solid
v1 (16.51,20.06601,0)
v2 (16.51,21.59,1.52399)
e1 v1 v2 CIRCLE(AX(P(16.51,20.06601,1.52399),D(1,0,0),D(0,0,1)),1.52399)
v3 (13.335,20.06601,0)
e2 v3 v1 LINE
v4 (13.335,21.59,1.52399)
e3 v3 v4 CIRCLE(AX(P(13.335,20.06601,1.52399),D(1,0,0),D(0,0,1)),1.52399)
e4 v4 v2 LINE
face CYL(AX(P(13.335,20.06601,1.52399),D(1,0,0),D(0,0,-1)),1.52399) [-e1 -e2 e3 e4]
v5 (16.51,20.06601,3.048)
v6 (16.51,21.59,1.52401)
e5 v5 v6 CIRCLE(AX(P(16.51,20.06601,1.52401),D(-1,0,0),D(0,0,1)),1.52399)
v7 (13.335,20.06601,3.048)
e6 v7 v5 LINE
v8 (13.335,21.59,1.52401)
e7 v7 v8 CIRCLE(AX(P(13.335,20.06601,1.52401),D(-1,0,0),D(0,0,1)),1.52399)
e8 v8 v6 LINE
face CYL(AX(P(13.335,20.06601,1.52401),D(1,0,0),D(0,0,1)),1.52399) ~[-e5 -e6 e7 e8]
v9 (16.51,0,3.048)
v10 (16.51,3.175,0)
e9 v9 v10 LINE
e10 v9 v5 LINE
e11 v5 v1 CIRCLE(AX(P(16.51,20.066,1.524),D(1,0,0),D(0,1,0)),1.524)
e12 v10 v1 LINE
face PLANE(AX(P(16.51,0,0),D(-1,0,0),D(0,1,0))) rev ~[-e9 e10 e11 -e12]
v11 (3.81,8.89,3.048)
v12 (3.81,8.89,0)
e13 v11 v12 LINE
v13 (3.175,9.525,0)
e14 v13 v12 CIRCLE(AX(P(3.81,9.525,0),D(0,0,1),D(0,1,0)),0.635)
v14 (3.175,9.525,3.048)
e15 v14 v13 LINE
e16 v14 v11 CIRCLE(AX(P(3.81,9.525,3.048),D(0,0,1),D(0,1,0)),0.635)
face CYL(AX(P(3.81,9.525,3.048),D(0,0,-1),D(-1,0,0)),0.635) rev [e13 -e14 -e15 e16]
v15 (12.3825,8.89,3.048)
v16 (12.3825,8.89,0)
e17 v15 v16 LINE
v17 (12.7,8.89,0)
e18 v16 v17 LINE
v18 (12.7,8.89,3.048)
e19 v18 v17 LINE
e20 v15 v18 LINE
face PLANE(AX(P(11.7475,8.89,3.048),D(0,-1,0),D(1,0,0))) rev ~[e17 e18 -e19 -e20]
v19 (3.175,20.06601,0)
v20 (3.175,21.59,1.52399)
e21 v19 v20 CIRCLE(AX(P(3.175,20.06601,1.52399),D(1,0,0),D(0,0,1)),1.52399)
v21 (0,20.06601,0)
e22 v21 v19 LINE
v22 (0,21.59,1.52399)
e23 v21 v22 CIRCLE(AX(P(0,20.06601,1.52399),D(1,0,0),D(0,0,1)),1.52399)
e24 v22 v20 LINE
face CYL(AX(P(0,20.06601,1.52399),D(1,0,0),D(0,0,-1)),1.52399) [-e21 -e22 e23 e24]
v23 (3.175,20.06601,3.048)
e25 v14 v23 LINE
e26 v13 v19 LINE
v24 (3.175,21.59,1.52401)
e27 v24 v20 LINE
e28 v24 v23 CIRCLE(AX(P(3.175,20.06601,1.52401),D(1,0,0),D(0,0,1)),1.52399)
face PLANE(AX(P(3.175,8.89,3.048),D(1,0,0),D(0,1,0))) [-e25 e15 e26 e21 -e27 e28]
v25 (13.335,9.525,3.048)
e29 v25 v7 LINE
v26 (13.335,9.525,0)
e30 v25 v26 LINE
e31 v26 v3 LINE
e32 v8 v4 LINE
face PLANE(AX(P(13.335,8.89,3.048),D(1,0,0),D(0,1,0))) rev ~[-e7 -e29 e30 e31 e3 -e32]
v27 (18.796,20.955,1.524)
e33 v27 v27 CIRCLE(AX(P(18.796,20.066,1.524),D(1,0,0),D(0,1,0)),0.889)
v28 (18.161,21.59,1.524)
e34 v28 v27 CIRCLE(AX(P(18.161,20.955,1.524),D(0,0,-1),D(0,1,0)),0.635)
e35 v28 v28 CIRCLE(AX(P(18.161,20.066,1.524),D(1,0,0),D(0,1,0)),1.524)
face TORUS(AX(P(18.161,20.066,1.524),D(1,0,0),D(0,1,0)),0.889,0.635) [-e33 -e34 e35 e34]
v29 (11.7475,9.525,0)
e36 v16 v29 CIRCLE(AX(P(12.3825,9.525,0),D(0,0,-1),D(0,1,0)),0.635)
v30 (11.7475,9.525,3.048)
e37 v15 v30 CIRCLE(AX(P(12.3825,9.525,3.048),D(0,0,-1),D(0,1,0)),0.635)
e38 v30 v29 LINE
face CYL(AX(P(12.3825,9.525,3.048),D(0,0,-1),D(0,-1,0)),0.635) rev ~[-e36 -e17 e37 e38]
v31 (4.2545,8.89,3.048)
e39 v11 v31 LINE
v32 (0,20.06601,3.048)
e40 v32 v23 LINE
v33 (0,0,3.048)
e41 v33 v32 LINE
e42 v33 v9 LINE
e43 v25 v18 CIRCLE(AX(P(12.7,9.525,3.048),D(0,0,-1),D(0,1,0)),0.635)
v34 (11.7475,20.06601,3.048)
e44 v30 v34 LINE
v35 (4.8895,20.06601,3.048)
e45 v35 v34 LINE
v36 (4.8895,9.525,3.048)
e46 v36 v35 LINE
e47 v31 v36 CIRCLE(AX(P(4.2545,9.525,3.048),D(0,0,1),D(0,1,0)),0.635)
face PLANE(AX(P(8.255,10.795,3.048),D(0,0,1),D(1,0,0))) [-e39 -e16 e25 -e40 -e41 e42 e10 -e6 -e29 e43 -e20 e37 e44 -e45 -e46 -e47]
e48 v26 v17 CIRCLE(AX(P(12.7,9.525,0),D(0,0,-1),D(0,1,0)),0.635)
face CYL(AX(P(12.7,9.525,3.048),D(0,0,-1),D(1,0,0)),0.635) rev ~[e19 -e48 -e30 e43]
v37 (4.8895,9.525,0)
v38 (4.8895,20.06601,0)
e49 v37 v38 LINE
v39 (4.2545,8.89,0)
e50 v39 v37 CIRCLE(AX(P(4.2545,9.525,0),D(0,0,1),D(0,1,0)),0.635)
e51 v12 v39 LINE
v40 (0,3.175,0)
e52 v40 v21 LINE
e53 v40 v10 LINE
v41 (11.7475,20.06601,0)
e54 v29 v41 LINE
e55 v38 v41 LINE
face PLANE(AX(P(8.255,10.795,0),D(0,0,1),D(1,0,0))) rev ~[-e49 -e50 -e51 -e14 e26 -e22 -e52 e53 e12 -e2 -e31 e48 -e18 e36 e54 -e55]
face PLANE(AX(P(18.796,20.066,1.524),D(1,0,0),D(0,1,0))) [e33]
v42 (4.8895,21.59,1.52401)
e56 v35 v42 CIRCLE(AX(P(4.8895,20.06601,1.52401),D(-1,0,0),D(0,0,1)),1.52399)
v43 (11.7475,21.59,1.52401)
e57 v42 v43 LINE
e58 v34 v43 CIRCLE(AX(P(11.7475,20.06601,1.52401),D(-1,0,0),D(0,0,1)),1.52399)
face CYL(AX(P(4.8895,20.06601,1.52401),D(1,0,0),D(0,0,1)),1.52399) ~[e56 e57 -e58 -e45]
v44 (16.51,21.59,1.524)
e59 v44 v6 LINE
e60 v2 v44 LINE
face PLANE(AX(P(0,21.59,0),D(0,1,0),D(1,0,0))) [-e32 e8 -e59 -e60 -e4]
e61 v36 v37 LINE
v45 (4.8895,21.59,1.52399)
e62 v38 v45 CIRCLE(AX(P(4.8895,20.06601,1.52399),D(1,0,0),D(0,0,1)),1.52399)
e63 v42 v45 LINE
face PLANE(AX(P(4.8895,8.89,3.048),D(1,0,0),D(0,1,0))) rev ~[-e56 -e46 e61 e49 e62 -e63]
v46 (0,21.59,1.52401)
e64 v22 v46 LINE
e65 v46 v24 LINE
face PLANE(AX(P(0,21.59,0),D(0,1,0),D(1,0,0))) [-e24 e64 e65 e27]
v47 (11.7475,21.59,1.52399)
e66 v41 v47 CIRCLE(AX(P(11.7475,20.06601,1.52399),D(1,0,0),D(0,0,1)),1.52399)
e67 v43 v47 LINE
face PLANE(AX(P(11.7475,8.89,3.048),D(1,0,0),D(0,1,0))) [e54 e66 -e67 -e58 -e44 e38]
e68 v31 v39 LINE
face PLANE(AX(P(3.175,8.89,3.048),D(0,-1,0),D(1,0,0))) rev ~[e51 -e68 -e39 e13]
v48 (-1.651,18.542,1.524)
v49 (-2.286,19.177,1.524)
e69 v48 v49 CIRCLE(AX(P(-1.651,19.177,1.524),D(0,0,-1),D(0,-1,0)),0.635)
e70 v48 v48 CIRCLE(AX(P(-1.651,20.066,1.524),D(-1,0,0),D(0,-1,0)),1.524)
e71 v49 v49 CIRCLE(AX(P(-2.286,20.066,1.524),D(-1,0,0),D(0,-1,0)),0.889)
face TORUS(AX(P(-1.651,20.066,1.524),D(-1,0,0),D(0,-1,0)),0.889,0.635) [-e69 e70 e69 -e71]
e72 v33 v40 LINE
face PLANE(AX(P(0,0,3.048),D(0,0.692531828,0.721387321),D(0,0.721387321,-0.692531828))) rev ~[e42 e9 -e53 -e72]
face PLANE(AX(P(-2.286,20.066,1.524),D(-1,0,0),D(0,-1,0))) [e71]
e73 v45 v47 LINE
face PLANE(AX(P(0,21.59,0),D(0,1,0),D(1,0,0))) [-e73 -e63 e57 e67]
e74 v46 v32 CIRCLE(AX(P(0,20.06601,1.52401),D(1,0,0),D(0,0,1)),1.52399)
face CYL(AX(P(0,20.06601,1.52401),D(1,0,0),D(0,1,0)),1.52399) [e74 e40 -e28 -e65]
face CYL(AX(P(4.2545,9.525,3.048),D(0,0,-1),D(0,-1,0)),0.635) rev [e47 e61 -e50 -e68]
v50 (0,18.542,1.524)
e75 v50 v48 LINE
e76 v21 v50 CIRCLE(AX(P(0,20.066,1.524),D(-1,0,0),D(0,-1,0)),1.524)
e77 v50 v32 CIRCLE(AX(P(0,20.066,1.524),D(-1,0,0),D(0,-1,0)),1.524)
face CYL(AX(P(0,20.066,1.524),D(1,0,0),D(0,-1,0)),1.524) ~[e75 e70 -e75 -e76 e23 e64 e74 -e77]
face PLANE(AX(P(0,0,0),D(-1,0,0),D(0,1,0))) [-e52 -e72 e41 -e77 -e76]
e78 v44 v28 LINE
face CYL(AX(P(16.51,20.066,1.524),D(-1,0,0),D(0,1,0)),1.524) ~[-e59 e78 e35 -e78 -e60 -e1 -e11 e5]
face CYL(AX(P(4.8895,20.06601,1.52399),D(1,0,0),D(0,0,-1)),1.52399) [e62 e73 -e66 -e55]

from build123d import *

# Parameters (mm, degrees)
F0_W      = 16.51
F0_H      = 21.59
F1_DEPTH  = 3.048
F2_W      = 1.7145
F2_H      = 12.7
F3_DEPTH  = 25.4
F4_W      = 1.5875
F4_H      = 12.7
F5_DEPTH  = 25.4
F7_DEPTH  = 25.4
F8_R      = 1.52399
F9_R      = 1.524
F10_DEPTH = 2.286
F11_R     = 1.524
F12_DEPTH = 2.286
F13_R     = 0.635
F14_R     = 0.635


# Not quite as in the source:
# - a fillet or chamfer is up to 0.001 mm smaller than in the source, because OpenCascade refuses the exact size


with BuildPart() as f1:
    # F0 (on Top) → F1 (new body)
    with BuildSketch(Plane.XY):
        with Locations((8.255, 10.795)):
            Rectangle(F0_W, F0_H)
    extrude(amount=F1_DEPTH)

    # F2 (on face) → F3 (cut)
    with BuildSketch(Plane.XY.offset(3.048)):
        with Locations((4.03225, 15.24)):
            Rectangle(F2_W, F2_H)
    extrude(amount=-F3_DEPTH, mode=Mode.SUBTRACT)

    # F4 (on face) → F5 (cut)
    with BuildSketch(Plane.XY.offset(3.048)):
        with Locations((12.54125, 15.24)):
            Rectangle(F4_W, F4_H)
    extrude(amount=-F5_DEPTH, mode=Mode.SUBTRACT)

    # F6 (on face) → F7 (cut)
    with BuildSketch(Plane(origin=(0, 0, 0), x_dir=(0, -1, 0), z_dir=(-1, 0, 0))):
        Polygon((0, 0), (0, 3.048), (-3.175, 0), align=None)
    extrude(amount=-F7_DEPTH, mode=Mode.SUBTRACT)

    # F8 (radius 1.524 in the source; OpenCascade refuses exactly that, so slightly less here)
    f8_edges = [f1.edges().sort_by_distance(p)[0] for p in [
        (1.5875, 21.59, 3.048),
        (1.5875, 21.59, 0),
        (8.3185, 21.59, 3.048),
        (8.3185, 21.59, 0),
        (14.9225, 21.59, 3.048),
        (14.9225, 21.59, 0),
    ]]
    fillet(f8_edges, radius=F8_R)

    # F9 (on face) → F10 (join)
    with BuildSketch(Plane(origin=(0, 0, 0), x_dir=(0, -1, 0), z_dir=(-1, 0, 0))):
        with Locations((-20.066, 1.524)):
            Circle(F9_R)
    extrude(amount=F10_DEPTH)

    # F11 (on face) → F12 (join)
    with BuildSketch(Plane.YZ.offset(16.51)):
        with Locations((20.066, 1.524)):
            Circle(F11_R)
    extrude(amount=F12_DEPTH)

    # F13
    f13_edges = [f1.edges().sort_by_distance(p)[0] for p in [
        (18.796, 18.542, 1.524),
        (-2.286, 21.59, 1.524),
    ]]
    fillet(f13_edges, radius=F13_R)

    # F14
    f14_edges = [f1.edges().sort_by_distance(p)[0] for p in [
        (11.7475, 8.89, 1.524),
        (13.335, 8.89, 1.524),
        (3.175, 8.89, 1.524),
        (4.8895, 8.89, 1.524),
    ]]
    fillet(f14_edges, radius=F14_R)


solid = f1.part
